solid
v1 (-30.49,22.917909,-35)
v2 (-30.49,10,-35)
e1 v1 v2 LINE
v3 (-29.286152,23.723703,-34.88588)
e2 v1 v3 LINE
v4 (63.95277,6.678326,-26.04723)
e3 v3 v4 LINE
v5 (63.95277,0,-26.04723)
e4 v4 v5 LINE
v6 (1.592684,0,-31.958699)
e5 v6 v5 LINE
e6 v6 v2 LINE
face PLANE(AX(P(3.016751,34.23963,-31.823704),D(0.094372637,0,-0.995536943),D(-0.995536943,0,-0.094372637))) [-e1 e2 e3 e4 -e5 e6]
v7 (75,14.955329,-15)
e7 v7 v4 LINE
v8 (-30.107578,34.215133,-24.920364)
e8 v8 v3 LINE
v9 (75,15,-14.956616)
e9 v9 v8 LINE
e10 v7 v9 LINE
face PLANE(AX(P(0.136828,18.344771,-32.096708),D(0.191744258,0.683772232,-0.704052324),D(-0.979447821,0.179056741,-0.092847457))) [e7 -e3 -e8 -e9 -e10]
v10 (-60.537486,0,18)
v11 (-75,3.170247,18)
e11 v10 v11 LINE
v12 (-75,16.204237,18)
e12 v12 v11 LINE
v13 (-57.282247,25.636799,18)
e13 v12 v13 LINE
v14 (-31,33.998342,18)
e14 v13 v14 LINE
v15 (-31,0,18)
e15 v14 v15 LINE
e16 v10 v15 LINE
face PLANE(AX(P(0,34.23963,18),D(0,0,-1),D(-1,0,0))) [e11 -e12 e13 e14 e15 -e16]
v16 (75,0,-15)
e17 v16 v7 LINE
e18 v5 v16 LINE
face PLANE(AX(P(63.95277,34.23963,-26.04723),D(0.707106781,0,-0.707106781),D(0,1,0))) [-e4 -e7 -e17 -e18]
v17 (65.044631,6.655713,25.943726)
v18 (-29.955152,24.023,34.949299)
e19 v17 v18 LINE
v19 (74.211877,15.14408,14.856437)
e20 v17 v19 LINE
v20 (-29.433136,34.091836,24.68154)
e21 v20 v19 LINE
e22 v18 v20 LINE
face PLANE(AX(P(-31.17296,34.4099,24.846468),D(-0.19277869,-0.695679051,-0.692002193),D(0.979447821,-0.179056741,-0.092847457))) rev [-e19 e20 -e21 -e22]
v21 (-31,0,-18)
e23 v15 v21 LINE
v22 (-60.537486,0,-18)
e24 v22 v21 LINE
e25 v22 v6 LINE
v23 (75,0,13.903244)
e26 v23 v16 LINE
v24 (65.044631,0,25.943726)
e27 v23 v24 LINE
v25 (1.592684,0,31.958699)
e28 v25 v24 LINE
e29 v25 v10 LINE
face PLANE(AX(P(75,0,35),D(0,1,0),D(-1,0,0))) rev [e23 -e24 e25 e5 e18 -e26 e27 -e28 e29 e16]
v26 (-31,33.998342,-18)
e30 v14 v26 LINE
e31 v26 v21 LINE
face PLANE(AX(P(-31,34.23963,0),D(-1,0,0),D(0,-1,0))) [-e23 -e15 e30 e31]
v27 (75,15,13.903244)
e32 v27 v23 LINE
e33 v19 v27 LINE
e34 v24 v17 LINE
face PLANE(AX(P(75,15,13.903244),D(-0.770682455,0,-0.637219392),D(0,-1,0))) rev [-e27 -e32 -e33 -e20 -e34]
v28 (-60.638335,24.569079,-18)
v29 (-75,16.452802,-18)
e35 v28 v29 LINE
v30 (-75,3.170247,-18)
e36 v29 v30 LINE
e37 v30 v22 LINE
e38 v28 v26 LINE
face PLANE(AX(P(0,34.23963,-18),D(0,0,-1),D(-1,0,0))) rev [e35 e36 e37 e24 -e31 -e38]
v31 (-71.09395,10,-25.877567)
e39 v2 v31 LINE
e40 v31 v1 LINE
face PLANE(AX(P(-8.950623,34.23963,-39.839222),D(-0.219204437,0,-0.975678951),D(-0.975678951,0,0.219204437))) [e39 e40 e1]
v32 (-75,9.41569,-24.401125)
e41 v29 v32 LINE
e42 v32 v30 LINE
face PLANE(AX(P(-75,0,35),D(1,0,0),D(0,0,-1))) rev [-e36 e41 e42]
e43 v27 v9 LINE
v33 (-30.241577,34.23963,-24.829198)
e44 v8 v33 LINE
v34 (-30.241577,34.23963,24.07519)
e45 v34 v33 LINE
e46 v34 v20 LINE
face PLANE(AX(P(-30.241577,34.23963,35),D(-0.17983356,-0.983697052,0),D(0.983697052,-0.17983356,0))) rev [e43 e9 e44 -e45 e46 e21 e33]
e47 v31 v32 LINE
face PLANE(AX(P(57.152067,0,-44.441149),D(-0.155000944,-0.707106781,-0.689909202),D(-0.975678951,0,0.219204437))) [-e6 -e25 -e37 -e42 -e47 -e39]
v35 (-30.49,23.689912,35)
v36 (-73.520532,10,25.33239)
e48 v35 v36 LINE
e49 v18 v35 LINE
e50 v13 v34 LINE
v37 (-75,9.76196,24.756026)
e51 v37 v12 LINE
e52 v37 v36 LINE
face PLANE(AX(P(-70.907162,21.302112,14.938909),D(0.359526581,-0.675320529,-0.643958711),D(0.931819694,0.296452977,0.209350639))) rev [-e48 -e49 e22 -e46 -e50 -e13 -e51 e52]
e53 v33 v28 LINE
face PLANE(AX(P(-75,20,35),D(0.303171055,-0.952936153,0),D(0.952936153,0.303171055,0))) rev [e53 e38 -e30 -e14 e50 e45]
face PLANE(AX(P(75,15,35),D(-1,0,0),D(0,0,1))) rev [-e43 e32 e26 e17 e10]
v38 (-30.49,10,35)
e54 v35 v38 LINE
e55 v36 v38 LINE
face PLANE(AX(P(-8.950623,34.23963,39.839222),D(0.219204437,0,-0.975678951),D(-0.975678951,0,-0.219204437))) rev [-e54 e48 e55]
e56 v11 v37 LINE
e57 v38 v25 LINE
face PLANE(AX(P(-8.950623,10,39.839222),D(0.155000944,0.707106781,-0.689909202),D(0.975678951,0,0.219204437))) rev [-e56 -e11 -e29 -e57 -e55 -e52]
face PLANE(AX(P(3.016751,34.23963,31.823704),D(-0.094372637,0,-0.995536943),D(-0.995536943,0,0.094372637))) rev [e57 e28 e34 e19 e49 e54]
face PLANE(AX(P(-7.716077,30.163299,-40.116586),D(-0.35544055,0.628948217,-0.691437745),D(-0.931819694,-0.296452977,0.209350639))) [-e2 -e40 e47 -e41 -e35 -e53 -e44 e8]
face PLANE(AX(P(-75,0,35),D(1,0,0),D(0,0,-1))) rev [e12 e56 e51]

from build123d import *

# Parameters (mm, degrees)
BOSS_EXTRUDE1_DEPTH = 35
SKETCH3_W           = 44
SKETCH3_H           = 36
CUT_EXTRUDE1_DEPTH  = 90.567584934
CHAMFER1_SIZE       = 10
CHAMFER1_SIZE_2     = 11.096755526
CHAMFER1_SIZE2      = 10.174134289
CHAMFER1_SIZE2_2    = 10.73729935


with BuildPart() as part:
    # Sketch1 → Boss-Extrude1 (new, symmetric)
    with BuildSketch(Plane.XY):
        Polygon((75, 0), (-75, 0), (-75, 20), (-30.241576831, 34.239630123), (75, 15), align=None)
    extrude(amount=BOSS_EXTRUDE1_DEPTH, both=True)

    # Sketch3 → Cut-Extrude1 (cut, through all)
    with BuildSketch(Plane.XZ):
        Polygon((-30.49, 35), (75, 25), (75, 35), align=None)
        Polygon((75, -35), (75, -25), (-30.49, -35), align=None)
        with Locations((-53, 0)):
            Rectangle(SKETCH3_W, SKETCH3_H)
        Polygon((-75, 25), (-30.49, 35), (-75, 35), align=None)
        Polygon((-75, -35), (-30.49, -35), (-75, -25), align=None)
    extrude(amount=-CUT_EXTRUDE1_DEPTH, mode=Mode.SUBTRACT)

    # Chamfer1
    chamfer1_edges = [part.edges().sort_by_distance(p)[0] for p in [
        (-52.745, 0, 30),
    ]]
    chamfer(chamfer1_edges, length=CHAMFER1_SIZE)
    chamfer1_2_edges = [part.edges().sort_by_distance(p)[0] for p in [
        (-52.745, 0, -30),
    ]]
    chamfer(chamfer1_2_edges, length=CHAMFER1_SIZE)
    chamfer1_3_edges = [part.edges().sort_by_distance(p)[0] for p in [
        (75, 7.5, 25),
    ]]
    chamfer1_3_side = [part.faces().sort_by_distance(p)[0] for p in [
        (75, 7.5, 24.8),
    ]]
    chamfer(chamfer1_3_edges, length=CHAMFER1_SIZE_2, length2=CHAMFER1_SIZE, reference=chamfer1_3_side[0])
    chamfer1_4_edges = [part.edges().sort_by_distance(p)[0] for p in [
        (75, 7.5, -25),
    ]]
    chamfer1_4_side = [part.faces().sort_by_distance(p)[0] for p in [
        (75, 7.5, -24.8),
    ]]
    chamfer(chamfer1_4_edges, length=CHAMFER1_SIZE, length2=CHAMFER1_SIZE_2, reference=chamfer1_4_side[0])
    chamfer1_5_edges = [part.edges().sort_by_distance(p)[0] for p in [
        (17.401526868, 25.52980535, 30.460088457),
    ]]
    chamfer1_5_side = [part.faces().sort_by_distance(p)[0] for p in [
        (17.365875348, 25.3330376, 30.463468068),
    ]]
    chamfer(chamfer1_5_edges, length=CHAMFER1_SIZE, length2=CHAMFER1_SIZE2, reference=chamfer1_5_side[0])
    chamfer1_6_edges = [part.edges().sort_by_distance(p)[0] for p in [
        (-58.87630634, 25.129658681, 28.622487904),
    ]]
    chamfer1_6_side = [part.faces().sort_by_distance(p)[0] for p in [
        (-58.818457754, 24.938649191, 28.635484665),
    ]]
    chamfer(chamfer1_6_edges, length=CHAMFER1_SIZE, length2=CHAMFER1_SIZE2_2, reference=chamfer1_6_side[0])
    chamfer1_7_edges = [part.edges().sort_by_distance(p)[0] for p in [
        (-52.745, 27.080297874, -30),
    ]]
    chamfer1_7_side = [part.faces().sort_by_distance(p)[0] for p in [
        (-52.705100441, 27.092991685, -29.804431873),
    ]]
    chamfer(chamfer1_7_edges, length=CHAMFER1_SIZE, length2=CHAMFER1_SIZE2_2, reference=chamfer1_7_side[0])
    chamfer1_8_edges = [part.edges().sort_by_distance(p)[0] for p in [
        (23.400963602, 24.433024522, -29.891367561),
    ]]
    chamfer1_8_side = [part.faces().sort_by_distance(p)[0] for p in [
        (23.382696848, 24.43636394, -29.692231492),
    ]]
    chamfer(chamfer1_8_edges, length=CHAMFER1_SIZE, length2=CHAMFER1_SIZE2, reference=chamfer1_8_side[0])


solid = part.part
